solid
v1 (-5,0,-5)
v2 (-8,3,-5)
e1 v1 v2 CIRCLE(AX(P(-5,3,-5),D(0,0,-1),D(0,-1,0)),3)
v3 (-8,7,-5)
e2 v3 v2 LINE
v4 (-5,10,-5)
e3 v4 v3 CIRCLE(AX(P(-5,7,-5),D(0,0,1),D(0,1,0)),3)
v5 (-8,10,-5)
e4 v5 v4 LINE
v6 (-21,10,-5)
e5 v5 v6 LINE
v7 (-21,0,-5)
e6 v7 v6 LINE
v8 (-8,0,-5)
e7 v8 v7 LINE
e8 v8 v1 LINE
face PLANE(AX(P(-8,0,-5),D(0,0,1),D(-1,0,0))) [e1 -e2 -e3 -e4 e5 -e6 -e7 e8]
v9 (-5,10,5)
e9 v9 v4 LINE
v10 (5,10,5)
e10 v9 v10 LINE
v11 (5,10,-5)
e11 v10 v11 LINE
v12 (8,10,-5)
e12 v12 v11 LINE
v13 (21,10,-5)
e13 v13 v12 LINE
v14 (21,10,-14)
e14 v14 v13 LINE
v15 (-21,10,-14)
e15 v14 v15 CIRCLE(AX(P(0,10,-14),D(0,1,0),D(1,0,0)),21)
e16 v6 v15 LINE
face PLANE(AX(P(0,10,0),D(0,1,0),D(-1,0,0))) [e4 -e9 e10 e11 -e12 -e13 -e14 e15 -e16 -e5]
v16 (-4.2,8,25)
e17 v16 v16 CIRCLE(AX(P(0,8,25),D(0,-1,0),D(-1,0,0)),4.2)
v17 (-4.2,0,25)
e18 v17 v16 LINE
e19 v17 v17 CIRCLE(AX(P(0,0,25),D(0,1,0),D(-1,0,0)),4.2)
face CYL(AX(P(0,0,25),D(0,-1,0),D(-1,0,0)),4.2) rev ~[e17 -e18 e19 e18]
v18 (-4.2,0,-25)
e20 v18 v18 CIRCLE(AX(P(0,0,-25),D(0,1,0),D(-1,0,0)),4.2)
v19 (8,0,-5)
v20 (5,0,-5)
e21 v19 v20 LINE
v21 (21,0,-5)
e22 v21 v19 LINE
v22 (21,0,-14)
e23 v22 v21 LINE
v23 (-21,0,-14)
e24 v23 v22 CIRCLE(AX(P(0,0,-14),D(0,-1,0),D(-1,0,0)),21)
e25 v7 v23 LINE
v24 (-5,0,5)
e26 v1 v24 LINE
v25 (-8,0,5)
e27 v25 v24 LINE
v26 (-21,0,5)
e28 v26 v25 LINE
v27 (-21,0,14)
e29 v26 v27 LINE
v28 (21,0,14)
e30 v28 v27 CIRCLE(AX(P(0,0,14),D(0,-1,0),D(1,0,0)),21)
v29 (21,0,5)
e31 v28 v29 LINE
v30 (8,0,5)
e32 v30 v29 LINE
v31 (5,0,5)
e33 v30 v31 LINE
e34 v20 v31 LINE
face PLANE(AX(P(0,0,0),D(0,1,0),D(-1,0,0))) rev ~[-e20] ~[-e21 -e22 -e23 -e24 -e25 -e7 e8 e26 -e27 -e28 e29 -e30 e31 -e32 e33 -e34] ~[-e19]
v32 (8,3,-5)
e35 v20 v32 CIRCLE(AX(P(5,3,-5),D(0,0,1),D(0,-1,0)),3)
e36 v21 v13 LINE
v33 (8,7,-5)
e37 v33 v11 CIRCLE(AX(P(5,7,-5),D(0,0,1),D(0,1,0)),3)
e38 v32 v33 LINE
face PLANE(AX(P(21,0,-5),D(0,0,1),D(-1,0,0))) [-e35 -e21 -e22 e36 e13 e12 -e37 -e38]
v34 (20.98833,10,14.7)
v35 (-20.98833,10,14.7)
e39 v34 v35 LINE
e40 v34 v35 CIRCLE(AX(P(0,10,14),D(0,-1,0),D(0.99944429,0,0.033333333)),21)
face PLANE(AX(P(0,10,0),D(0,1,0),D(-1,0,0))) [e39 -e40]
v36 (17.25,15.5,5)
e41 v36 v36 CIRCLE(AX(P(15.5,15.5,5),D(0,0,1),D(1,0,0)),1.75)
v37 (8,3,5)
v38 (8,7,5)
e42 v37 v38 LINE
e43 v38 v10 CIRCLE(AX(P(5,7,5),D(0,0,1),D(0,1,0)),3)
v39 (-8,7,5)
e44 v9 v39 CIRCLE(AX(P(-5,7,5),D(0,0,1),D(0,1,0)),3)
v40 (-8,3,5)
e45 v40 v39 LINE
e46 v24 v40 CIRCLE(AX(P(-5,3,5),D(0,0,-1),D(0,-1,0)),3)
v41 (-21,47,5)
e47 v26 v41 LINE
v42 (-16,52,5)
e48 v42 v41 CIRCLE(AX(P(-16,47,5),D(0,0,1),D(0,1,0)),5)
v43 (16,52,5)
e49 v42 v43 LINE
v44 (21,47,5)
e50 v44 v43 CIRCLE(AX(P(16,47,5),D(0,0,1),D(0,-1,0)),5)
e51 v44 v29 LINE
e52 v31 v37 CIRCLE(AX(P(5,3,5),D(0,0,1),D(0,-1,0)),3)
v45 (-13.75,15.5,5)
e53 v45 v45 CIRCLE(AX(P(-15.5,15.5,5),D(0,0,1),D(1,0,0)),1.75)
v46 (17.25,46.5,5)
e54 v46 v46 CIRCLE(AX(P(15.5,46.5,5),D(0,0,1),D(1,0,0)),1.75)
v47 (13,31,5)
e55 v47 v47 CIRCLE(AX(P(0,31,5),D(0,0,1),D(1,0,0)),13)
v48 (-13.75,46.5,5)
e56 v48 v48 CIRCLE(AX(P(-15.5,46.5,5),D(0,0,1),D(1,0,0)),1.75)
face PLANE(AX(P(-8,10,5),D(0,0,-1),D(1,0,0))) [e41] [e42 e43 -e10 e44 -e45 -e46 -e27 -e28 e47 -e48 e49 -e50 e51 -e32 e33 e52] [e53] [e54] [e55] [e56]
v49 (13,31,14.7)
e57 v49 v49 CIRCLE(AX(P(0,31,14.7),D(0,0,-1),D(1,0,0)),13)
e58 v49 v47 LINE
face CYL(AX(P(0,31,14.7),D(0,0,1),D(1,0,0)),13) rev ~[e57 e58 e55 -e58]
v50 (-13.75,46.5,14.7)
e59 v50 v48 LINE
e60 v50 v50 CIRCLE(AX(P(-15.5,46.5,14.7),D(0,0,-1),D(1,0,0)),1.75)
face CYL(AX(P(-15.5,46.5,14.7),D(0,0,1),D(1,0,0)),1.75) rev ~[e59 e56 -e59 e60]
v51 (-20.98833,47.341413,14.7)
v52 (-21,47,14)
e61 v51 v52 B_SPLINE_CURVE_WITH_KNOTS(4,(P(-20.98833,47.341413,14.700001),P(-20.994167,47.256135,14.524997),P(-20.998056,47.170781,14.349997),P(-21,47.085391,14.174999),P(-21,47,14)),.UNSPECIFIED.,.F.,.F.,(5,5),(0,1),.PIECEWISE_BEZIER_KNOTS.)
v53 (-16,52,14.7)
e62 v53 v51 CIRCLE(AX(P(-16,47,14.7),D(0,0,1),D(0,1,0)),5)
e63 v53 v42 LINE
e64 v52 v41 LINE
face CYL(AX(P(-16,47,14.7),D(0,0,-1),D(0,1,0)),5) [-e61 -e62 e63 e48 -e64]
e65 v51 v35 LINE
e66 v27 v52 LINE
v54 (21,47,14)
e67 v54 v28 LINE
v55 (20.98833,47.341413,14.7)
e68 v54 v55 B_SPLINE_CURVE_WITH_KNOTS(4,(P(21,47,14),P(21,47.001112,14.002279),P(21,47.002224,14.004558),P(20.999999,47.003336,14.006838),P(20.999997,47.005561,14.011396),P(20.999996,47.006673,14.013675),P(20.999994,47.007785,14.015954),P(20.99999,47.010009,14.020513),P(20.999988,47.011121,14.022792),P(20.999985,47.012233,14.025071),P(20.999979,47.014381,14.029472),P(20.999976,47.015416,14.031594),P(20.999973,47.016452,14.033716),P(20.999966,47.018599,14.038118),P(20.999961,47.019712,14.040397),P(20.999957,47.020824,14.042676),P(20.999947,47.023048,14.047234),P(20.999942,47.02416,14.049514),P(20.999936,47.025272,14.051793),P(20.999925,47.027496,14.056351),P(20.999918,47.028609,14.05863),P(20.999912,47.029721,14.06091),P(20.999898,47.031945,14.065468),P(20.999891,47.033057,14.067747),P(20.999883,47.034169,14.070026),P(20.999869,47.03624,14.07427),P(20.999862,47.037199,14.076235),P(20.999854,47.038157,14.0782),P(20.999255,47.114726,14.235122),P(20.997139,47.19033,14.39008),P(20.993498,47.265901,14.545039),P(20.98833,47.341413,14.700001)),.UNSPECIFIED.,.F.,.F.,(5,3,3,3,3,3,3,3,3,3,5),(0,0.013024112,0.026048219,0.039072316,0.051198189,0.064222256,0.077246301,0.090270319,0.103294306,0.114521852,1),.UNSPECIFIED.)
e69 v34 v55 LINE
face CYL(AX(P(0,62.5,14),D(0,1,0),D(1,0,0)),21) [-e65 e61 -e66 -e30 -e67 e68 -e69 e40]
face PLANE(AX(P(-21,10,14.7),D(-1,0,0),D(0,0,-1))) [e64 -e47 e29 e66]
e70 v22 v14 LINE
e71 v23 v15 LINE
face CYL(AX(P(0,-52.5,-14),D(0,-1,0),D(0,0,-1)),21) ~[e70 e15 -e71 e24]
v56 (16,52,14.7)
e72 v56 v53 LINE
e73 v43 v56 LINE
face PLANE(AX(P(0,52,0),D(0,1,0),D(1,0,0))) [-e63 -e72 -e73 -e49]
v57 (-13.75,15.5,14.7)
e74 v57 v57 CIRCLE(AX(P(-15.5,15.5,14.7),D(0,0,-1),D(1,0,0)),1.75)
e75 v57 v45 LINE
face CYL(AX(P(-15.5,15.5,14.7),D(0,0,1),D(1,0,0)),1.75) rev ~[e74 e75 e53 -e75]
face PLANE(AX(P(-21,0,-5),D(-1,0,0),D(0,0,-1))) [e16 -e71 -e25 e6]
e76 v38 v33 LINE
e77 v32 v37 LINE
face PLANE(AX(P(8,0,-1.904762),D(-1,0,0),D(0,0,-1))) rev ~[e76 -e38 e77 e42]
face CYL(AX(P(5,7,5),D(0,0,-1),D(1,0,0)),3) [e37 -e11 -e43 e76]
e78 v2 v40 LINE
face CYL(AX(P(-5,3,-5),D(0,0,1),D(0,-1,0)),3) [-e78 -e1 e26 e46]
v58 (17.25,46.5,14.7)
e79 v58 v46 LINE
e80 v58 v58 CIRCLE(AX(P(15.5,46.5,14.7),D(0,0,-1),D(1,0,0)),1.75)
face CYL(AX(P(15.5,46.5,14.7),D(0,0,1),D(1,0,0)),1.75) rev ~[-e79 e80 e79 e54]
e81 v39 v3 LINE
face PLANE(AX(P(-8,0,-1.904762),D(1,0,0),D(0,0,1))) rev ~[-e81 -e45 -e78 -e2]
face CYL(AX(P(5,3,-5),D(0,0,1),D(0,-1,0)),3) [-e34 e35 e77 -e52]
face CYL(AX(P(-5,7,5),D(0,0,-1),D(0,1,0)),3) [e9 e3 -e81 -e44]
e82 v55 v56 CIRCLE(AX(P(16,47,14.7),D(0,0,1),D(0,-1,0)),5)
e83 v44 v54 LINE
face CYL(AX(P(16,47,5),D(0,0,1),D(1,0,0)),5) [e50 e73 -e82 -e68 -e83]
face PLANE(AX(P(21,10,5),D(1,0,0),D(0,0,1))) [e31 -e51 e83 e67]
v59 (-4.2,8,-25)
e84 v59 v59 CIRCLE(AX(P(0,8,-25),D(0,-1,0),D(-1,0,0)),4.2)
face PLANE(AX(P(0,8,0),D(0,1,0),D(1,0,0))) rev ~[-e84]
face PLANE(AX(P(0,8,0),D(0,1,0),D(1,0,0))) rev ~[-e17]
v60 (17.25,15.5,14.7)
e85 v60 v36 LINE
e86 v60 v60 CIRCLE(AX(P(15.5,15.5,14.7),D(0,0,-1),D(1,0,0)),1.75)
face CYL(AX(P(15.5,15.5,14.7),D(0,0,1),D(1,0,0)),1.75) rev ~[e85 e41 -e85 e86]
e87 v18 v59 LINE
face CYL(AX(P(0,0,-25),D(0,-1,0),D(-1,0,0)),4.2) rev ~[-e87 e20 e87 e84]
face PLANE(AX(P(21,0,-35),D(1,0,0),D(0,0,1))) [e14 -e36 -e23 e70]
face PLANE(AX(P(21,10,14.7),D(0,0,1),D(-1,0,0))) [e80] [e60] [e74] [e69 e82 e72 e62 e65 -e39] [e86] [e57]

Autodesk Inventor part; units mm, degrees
ref_plane "YZ Plane" through (0, 0, 0) normal (1, 0, 0) x (0, 1, 0)
ref_plane "XZ Plane" through (0, 0, 0) normal (0, 1, 0) x (-1, 0, 0)
ref_plane "XY Plane" through (0, 0, 0) normal (0, 0, 1) x (1, 0, 0)
sketch "Esquisse1" plane through (0, 0, 0) normal (0, 1, 0) x (-1, 0, 0)
  circle A0 centre (0, 25) radius 4.2
  line L0 (16, 0) -> (-13, 0)
  circle A1 centre (0, -25) radius 4.2
  line L1 (21, 5) -> (-21, 5)
  line L2 (-21, 5) -> (-21, -5)
  line L3 (-21, -5) -> (21, -5)
  line L4 (21, -5) -> (21, 5)
  line L5 (21, 5) -> (-21, -5)
  line L6 (-21, 5) -> (21, -5)
  line L7 (8, 5) -> (-8, 5)
  line L8 (-8, 5) -> (-8, -5)
  line L9 (-8, -5) -> (8, -5)
  line L10 (8, -5) -> (8, 5)
  line L11 (8, 5) -> (-8, -5)
  line L12 (-8, 5) -> (8, -5)
  line L13 (21, 5) -> (21, 35)
  line L14 (-21, 35) -> (-21, 5)
  line L15 (21, 35) -> (-21, 35)
  line L16 (21, -5) -> (21, -35)
  line L17 (-21, -35) -> (-21, -5)
  line L18 (21, -35) -> (-21, -35)
  point P0 (0, 0)
  point P1 (0, 0)
  point P2 (0, 0)
  point P3 (8, -5)
  point P4 (-8, 5)
  dimension "d0" = 8.4
  dimension "d1" = 25
  dimension "d2" = 42
  dimension "d3" = 10
  dimension "d4" = 16
extrude "Extrusion1" add sketch "Esquisse1" along normal blind 10 contours L10 L6 L0 | L0 L5 L10 | L5 L8 L0 | L11 L10 L5 | L11 L8 L5 | L0 L8 L6 | L12 L1 L11 | L12 L3 L11 | L6 L8 L12 | L6 L10 L12 | L1 L14 L15 L13 | L3 L16 L18 L17
sketch "Esquisse2" plane through (0, 10, 0) normal (0, 1, 0) x (1, 0, 0)
  line L0 (-8, -5) -> (-21, -5) projected
  line L1 (-21, -5) -> (21, -5)
  line L2 (21, -5) -> (21, -14.7)
  line L3 (21, -14.7) -> (-21, -14.7)
  line L4 (-21, -14.7) -> (-21, -5)
  point P0 (0, 0)
  dimension "d8" = 9.7
  dimension "d9" = 42
extrude "Extrusion2" add sketch "Esquisse2" along normal blind 42
sketch "Esquisse3" plane through (0, 10, 0) normal (0, 1, 0) x (1, 0, 0)
  line L0 (21, -14.7) -> (-21, -14.7) projected
  line L1 (-21, -35) -> (21, -35)
  line L2 (21, -35) -> (21, -14.7)
  line L3 (21, -14.7) -> (-21, -14.7)
  line L4 (-21, -14.7) -> (-21, -35)
  line L5 (21, 35) -> (-21, 35) projected
  line L6 (-21, 5) -> (21, 5)
  line L7 (21, 5) -> (21, 35)
  line L8 (21, 35) -> (-21, 35)
  line L9 (-21, 35) -> (-21, 5)
  point P0 (0, 0)
  point P1 (-21, -14.7)
extrude "Extrusion3" add sketch "Esquisse3" against normal blind 2
sketch "Esquisse4" plane through (-21, 10, 14.7) normal (0, 0, 1) x (1, 0, 0)
  line L0 (42, 42) -> (0, 42) projected
  line L1 (42, 0) -> (0, 0)
  line L2 (0, 0) -> (42, 42)
  circle A0 centre (21, 21) radius 13
  line L3 (5.5, 5.5) -> (36.5, 5.5)
  line L4 (36.5, 5.5) -> (36.5, 36.5)
  line L5 (36.5, 36.5) -> (5.5, 36.5)
  line L6 (5.5, 36.5) -> (5.5, 5.5)
  line L7 (5.5, 36.5) -> (36.5, 5.5)
  circle A1 centre (5.5, 36.5) radius 1.75
  circle A2 centre (5.5, 5.5) radius 1.75
  line L8 (21, 36.5) -> (21, 5.5)
  circle A3 centre (36.5, 36.5) radius 1.75
  circle A4 centre (36.5, 5.5) radius 1.75
  point P0 (21, -10)
  point P1 (36.5, 5.5)
  dimension "d14" = 26
  dimension "d20" = 31
  dimension "d21" = 3.5
  dimension "d22" = 3.5
extrude "Extrusion4" cut sketch "Esquisse4" against normal blind 10 contours A2 L6 L2 | L2 L3 A2 | L6 A2 L2 | L2 A2 L3 | A1 L5 L6 | L6 L7 A1 | A0 L7 L2 | L2 L8 A0 | L5 A1 L7 | A4 L7 L3 | L3 L4 A4 | L8 L7 A0 | L8 A0 L2 | L2 A0 L7 | L7 A0 L8 | L7 A4 L4 | A3 L2 L5 | L5 L2 A3 | L2 L4 A3 | L2 A3 L4
fillet "Congé1" radius 5 2 edges at (21, 52, 9.85) (-21, 52, 9.85)
fillet "Congé2" radius 21 4 edges at (21, 5, -35) (-21, 5, -35) (21, 5, 35) (-21, 5, 35)
fillet "Congé3" radius 3 4 edges at (-8, 10, 0) (-8, 0, 0) (8, 0, 0) (8, 10, 0)
properties part number "tete_v2"
